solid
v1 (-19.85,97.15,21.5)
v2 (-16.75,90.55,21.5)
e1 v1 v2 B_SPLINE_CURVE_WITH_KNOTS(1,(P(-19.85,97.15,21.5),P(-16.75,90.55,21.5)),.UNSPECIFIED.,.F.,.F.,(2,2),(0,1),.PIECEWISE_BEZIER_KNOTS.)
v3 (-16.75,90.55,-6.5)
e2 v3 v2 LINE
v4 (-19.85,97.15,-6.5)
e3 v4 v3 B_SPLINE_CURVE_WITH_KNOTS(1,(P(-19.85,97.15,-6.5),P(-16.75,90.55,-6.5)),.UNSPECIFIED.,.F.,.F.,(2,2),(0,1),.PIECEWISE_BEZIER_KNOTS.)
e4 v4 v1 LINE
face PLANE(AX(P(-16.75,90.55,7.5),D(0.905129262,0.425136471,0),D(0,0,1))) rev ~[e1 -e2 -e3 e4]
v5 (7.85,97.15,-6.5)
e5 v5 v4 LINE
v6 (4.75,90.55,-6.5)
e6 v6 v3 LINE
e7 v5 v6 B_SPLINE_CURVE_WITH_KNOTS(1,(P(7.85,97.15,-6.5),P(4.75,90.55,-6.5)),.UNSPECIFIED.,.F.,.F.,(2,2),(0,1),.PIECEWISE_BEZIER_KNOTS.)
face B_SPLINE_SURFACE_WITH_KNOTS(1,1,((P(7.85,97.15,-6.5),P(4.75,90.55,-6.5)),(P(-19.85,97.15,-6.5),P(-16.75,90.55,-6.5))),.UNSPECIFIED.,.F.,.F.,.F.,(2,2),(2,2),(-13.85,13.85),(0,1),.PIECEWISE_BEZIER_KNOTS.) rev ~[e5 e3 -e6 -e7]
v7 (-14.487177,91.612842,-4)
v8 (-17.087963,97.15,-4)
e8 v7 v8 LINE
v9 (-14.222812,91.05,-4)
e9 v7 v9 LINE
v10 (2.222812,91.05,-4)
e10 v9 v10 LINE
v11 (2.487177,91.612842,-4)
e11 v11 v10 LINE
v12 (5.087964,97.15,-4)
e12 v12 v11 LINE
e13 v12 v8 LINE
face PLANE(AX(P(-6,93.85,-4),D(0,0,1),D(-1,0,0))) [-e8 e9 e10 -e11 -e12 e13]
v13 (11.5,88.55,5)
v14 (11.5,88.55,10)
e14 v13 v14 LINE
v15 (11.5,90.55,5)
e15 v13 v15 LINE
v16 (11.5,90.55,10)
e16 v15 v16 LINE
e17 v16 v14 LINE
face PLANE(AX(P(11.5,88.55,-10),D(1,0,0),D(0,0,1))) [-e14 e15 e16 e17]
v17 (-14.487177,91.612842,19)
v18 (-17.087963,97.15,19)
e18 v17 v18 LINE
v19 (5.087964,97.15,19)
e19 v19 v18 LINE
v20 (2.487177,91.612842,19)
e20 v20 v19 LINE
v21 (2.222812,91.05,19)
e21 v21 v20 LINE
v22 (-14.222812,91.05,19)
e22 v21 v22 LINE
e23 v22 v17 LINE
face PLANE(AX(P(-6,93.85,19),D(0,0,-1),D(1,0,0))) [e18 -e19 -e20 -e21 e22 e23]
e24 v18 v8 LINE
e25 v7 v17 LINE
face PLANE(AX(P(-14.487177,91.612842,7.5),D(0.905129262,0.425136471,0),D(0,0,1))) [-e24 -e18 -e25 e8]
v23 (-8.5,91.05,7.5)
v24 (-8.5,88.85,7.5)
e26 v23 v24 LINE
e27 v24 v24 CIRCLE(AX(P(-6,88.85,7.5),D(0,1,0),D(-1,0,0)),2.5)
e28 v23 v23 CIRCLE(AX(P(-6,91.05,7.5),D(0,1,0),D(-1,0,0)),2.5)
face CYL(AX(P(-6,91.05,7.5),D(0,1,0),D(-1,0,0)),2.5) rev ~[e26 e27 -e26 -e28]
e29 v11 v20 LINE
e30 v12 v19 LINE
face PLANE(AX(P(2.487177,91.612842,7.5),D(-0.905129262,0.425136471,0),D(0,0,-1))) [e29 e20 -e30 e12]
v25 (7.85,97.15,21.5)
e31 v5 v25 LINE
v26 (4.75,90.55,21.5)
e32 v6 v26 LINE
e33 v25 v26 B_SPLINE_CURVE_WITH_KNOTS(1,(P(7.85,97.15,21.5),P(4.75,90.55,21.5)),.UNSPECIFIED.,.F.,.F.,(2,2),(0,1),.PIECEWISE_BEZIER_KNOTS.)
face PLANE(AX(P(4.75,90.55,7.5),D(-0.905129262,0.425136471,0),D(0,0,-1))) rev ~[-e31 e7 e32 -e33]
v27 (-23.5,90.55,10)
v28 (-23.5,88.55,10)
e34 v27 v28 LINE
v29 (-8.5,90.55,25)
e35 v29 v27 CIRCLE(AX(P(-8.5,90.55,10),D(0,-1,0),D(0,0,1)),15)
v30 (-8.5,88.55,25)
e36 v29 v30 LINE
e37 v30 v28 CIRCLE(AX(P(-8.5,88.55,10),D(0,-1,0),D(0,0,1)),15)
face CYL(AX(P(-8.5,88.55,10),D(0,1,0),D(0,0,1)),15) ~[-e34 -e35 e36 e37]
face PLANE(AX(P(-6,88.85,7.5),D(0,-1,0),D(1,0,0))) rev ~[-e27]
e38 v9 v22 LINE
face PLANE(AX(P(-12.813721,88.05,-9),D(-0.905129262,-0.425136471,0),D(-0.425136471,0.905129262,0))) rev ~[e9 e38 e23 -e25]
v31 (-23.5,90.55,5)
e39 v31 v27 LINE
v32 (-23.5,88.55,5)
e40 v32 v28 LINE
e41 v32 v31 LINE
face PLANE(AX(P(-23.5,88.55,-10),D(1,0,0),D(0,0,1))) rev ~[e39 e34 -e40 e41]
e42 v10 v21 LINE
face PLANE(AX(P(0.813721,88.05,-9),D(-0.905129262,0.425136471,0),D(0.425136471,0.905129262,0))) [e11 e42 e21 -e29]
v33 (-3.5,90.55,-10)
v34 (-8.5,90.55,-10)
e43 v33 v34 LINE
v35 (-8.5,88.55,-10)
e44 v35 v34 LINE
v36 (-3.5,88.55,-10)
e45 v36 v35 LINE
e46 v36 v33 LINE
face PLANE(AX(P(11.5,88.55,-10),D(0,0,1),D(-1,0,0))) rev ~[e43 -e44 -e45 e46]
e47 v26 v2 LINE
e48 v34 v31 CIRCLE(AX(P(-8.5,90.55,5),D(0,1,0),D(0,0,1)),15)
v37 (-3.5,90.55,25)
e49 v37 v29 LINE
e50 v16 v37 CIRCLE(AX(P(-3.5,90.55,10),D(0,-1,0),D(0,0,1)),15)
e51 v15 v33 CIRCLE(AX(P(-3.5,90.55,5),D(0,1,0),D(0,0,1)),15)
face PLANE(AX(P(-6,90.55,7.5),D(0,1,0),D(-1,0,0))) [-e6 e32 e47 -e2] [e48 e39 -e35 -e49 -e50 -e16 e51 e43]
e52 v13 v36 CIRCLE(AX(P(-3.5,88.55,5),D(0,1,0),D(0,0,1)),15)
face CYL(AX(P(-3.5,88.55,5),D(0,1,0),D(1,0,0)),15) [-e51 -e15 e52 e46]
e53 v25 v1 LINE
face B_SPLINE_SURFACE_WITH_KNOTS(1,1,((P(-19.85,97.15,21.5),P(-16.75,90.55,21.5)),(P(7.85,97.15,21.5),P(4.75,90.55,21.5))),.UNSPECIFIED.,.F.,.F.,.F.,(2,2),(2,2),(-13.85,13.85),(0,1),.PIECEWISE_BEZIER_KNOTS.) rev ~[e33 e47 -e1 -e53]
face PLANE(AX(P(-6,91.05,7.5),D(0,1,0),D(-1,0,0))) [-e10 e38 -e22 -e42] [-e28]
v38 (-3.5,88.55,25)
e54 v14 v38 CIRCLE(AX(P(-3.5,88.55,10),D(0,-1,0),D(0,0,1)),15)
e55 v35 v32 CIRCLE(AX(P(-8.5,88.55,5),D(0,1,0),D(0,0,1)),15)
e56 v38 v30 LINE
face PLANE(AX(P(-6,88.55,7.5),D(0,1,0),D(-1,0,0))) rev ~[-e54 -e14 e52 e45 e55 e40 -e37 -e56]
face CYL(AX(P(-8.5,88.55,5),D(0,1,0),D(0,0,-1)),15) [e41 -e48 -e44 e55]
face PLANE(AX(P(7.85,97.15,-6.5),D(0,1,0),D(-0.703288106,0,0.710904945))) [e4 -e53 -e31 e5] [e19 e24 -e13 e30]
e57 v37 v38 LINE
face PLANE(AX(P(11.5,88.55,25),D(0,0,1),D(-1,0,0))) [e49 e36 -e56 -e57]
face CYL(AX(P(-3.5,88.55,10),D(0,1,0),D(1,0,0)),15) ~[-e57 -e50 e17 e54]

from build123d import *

# Parameters (mm, degrees)
F1_DEPTH     = 6
F3_DEPTH     = 15
F5_DEPTH     = 5.0000008951
F6_R         = 5
F10_DEPTH    = 5
F11_W        = 35
F11_H        = 35
F12_DEPTH    = 2
F15_W        = 27.7
F15_H        = 28
F13_W        = 21.5
F13_H        = 28
F17_T        = 2.5
F17_T3_DEPTH = 26.5
F17_T5_DEPTH = 33
F19_R        = 2.5
F20_DEPTH    = 54.5
F21_R        = 15
F22_R        = 3
F23_R        = 0.5
F24_R        = 2
F25_R        = 6
F28_DEPTH    = 0.3


# Not quite as in the source:
# - ends of sketch curves that miss each other by under 0.0002 mm in the source are joined
# - a shell that OpenCascade refuses in one call is made with other operations: the cavity is built on its own and cut out


with BuildPart() as f1:
    # F0 (on Top) → F1 (new body)
    with BuildSketch(Plane.XY):
        Polygon((11.0000005256, -18.05), (11.0000005256, -20.55), (-11.0000005256, -20.55), (-10.9999994744, 20.55), (11.0000005256, 20.55), (11.0000005256, 18.05), (15.8927322497, 21.8000001848), (16.1137396651, 25.5500003695), (11.4420153564, 25.5500003695), (-15.9999997161, 25.5500003695), (-16.000001023, -25.5500003695), (11.4420153564, -25.5500003695), (16.1137396651, -25.5500003695), (15.8927322497, -21.8000001848), align=None)
    extrude(amount=F1_DEPTH)

    # F2 (on face) → F3 (join)
    with BuildSketch(Plane(origin=(0, 0, 0), x_dir=(1, 0, 0), z_dir=(0, 0, -1))):
        Polygon((-10.9999994744, -25.5500003695), (-15.9999997161, -25.5500003695), (-15.9999997161, -40.5500003695), (-10.9999994744, -40.5500003695), (4.0000002839, -40.5500003695), (4.0000002839, -36.5500003695), (-10.9999994744, -36.5500003695), align=None)
    extrude(amount=-F3_DEPTH)

    # F4 (on face) → F5 (cut, through all)
    with BuildSketch(Plane.YZ.offset(-10.9999994744)):
        Polygon((25.5500003695, 15), (25.5500003695, 6), (29.5500003695, 6), (36.5500003695, 15), align=None)
    extrude(amount=-F5_DEPTH, mode=Mode.SUBTRACT)

    # F6
    f6_edges = [f1.edges().sort_by_distance(p)[0] for p in [
        (4, 38.55, 15),
    ]]
    fillet(f6_edges, radius=F6_R)


with BuildPart() as f10:
    # F9 (on offset) → F10 (new body)
    with BuildSketch(Plane(origin=(0, 65.5500003695, 0), x_dir=(-1, 0, 0), z_dir=(0, 1, 0))):
        with BuildLine():
            Line((15.9999997161, 0), (15.9999997161, 15))
            Line((15.9999997161, 15), (0.9999997161, 15))
            ThreePointArc((0.9999997161, 15), (-2.5355341898, 13.5355339059), (-4.0000002839, 10))
            Line((-4.0000002839, 10), (-4.0000002839, 0))
            Line((-4.0000002839, 0), (15.9999997161, 0))
        make_face()
    extrude(amount=F10_DEPTH)


with BuildPart() as f12:
    # F11 (on offset) → F12 (new body)
    with BuildSketch(Plane(origin=(0, 88.5500003695, 0), x_dir=(-1, 0, 0), z_dir=(0, 1, 0))):
        with Locations((5.9999997161, 7.5)):
            Rectangle(F11_W, F11_H)
    extrude(amount=F12_DEPTH)

    # F15 (on offset) → F16 section 0
    with BuildSketch(Plane(origin=(0, 97.1500003695, 0), x_dir=(-1, 0, 0), z_dir=(0, 1, 0))):
        with Locations((5.9999997161, 7.5)):
            Rectangle(F15_W, F15_H)
    # F13 (on face) → F16 section 1
    with BuildSketch(Plane(origin=(0, 90.5500003695, 0), x_dir=(-1, 0, 0), z_dir=(0, 1, 0))):
        with Locations((5.9999997161, 7.5)):
            Rectangle(F13_W, F13_H)
    loft()

    # F17: shell of thickness 2.5, made by hand


with BuildPart() as f17_core1:
    # F17_t2: copy of F12
    add(f12.part)

    # the walls: a layer under each face that stays
    f17_faces = [f17_core1.faces().sort_by_distance(p)[0] for p in [
        (-5.9999997161, 89.5500003695, -10),
        (11.5000002839, 89.5500003695, 7.5),
        (-23.4999997161, 89.5500003695, 7.5),
        (-5.9999997161, 88.5500003695, 7.5),
        (5.6666669506, 90.5500003695, -4.1666666667),
        (-5.9999997161, 89.5500003695, 25),
        (-5.9999997161, 93.8500003695, -6.5),
        (-18.2999997161, 93.8500003695, 7.5),
        (-5.9999997161, 93.8500003695, 21.5),
        (6.3000002839, 93.8500003695, 7.5),
    ]]
    thicken(f17_faces, amount=-F17_T, mode=Mode.SUBTRACT)

    # F17_s4 → F17_t3 (cut)
    with BuildSketch(Plane.YZ.offset(-19.2499997161)):
        Polygon((90.5750003695, -6.525), (88.0500003695, -6.5), (88.0500003695, -4), (90.5500003695, -4), align=None)
        Polygon((90.5750003695, 21.525), (88.0500003695, 21.5), (88.0500003695, 19), (90.5500003695, 19), align=None)
    extrude(amount=F17_T3_DEPTH, mode=Mode.SUBTRACT)

    # F17_s6 → F17_t5 (cut)
    with BuildSketch(Plane.XY.offset(-9)):
        Polygon((-16.7726279476, 90.5643719578), (-16.7499997161, 88.0500003695), (-12.8137208564, 88.0500003695), (-14.4871765615, 91.6128415482), align=None)
        Polygon((4.7726285154, 90.5643719578), (4.7500002839, 88.0500003695), (0.8137214242, 88.0500003695), (2.4871771293, 91.6128415482), align=None)
    extrude(amount=F17_T5_DEPTH, mode=Mode.SUBTRACT)


with BuildPart() as f12_1:
    add(f12.part)

    # what is left inside the walls is the cavity
    f17_cavity = [f17_core1.part.solids().sort_by_distance(p)[0] for p in [
        (-2.215544, 97.125, 11.243908),
    ]]
    add(f17_cavity, mode=Mode.SUBTRACT)


with BuildPart() as f20_tool:
    # F19 (on face) → F20 (new body, through all)
    with BuildSketch(Plane(origin=(0, 91.0500003695, 0), x_dir=(-1, 0, 0), z_dir=(0, 1, 0))):
        with Locations((5.9999997161, 7.5)):
            Circle(F19_R)
    extrude(amount=-F20_DEPTH)


with BuildPart() as f1_1:
    add(f1.part)

    # F20: cut by f20_tool
    add(f20_tool.part, mode=Mode.SUBTRACT)

    # F22
    f22_edges = [f1_1.edges().sort_by_distance(p)[0] for p in [
        (-16.000001, -25.55, 3),
        (-10.999999, 25.55, 3),
    ]]
    fillet(f22_edges, radius=F22_R)

    # F23
    f23_edges = [f1_1.edges().sort_by_distance(p)[0] for p in [
        (11.000001, -18.05, 3),
        (11.000001, 18.05, 3),
        (-10.999999, 20.55, 3),
        (-11.000001, -20.55, 3),
    ]]
    fillet(f23_edges, radius=F23_R)

    # F24
    f24_edges = [f1_1.edges().sort_by_distance(p)[0] for p in [
        (-16, 40.55, 7.5),
        (-10.999999, 36.55, 7.5),
    ]]
    fillet(f24_edges, radius=F24_R)

    # F25
    f25_edges = [f1_1.edges().sort_by_distance(p)[0] for p in [
        (-13.5, 29.55, 6),
    ]]
    fillet(f25_edges, radius=F25_R)


with BuildPart() as f12_2:
    add(f12_1.part)

    # F20: cut by f20_tool
    add(f20_tool.part, mode=Mode.SUBTRACT)

    # F21
    f21_edges = [f12_2.edges().sort_by_distance(p)[0] for p in [
        (11.5, 89.55, 25),
        (-23.5, 89.55, 25),
        (-23.5, 89.55, -10),
        (11.5, 89.55, -10),
    ]]
    fillet(f21_edges, radius=F21_R)

    # F27 (on face) → F28 (join)
    with BuildSketch(Plane.XZ.offset(-88.5500003695)):
        with BuildLine():
            ThreePointArc((11.5000002839, 10), (7.1066020017, 20.6066017178), (-3.4999997161, 25))
            Line((-3.4999997161, 25), (-8.4999997161, 25))
            ThreePointArc((-8.4999997161, 25), (-19.1066014339, 20.6066017178), (-23.4999997161, 10))
            Line((-23.4999997161, 10), (-23.4999997161, 5))
            ThreePointArc((-23.4999997161, 5), (-19.1066014339, -5.6066017178), (-8.4999997161, -10))
            Line((-8.4999997161, -10), (-3.4999997161, -10))
            ThreePointArc((-3.4999997161, -10), (7.1066020017, -5.6066017178), (11.5000002839, 5))
            Line((11.5000002839, 5), (11.5000002839, 10))
        make_face()
    extrude(amount=-F28_DEPTH)


solid = f12_2.part
